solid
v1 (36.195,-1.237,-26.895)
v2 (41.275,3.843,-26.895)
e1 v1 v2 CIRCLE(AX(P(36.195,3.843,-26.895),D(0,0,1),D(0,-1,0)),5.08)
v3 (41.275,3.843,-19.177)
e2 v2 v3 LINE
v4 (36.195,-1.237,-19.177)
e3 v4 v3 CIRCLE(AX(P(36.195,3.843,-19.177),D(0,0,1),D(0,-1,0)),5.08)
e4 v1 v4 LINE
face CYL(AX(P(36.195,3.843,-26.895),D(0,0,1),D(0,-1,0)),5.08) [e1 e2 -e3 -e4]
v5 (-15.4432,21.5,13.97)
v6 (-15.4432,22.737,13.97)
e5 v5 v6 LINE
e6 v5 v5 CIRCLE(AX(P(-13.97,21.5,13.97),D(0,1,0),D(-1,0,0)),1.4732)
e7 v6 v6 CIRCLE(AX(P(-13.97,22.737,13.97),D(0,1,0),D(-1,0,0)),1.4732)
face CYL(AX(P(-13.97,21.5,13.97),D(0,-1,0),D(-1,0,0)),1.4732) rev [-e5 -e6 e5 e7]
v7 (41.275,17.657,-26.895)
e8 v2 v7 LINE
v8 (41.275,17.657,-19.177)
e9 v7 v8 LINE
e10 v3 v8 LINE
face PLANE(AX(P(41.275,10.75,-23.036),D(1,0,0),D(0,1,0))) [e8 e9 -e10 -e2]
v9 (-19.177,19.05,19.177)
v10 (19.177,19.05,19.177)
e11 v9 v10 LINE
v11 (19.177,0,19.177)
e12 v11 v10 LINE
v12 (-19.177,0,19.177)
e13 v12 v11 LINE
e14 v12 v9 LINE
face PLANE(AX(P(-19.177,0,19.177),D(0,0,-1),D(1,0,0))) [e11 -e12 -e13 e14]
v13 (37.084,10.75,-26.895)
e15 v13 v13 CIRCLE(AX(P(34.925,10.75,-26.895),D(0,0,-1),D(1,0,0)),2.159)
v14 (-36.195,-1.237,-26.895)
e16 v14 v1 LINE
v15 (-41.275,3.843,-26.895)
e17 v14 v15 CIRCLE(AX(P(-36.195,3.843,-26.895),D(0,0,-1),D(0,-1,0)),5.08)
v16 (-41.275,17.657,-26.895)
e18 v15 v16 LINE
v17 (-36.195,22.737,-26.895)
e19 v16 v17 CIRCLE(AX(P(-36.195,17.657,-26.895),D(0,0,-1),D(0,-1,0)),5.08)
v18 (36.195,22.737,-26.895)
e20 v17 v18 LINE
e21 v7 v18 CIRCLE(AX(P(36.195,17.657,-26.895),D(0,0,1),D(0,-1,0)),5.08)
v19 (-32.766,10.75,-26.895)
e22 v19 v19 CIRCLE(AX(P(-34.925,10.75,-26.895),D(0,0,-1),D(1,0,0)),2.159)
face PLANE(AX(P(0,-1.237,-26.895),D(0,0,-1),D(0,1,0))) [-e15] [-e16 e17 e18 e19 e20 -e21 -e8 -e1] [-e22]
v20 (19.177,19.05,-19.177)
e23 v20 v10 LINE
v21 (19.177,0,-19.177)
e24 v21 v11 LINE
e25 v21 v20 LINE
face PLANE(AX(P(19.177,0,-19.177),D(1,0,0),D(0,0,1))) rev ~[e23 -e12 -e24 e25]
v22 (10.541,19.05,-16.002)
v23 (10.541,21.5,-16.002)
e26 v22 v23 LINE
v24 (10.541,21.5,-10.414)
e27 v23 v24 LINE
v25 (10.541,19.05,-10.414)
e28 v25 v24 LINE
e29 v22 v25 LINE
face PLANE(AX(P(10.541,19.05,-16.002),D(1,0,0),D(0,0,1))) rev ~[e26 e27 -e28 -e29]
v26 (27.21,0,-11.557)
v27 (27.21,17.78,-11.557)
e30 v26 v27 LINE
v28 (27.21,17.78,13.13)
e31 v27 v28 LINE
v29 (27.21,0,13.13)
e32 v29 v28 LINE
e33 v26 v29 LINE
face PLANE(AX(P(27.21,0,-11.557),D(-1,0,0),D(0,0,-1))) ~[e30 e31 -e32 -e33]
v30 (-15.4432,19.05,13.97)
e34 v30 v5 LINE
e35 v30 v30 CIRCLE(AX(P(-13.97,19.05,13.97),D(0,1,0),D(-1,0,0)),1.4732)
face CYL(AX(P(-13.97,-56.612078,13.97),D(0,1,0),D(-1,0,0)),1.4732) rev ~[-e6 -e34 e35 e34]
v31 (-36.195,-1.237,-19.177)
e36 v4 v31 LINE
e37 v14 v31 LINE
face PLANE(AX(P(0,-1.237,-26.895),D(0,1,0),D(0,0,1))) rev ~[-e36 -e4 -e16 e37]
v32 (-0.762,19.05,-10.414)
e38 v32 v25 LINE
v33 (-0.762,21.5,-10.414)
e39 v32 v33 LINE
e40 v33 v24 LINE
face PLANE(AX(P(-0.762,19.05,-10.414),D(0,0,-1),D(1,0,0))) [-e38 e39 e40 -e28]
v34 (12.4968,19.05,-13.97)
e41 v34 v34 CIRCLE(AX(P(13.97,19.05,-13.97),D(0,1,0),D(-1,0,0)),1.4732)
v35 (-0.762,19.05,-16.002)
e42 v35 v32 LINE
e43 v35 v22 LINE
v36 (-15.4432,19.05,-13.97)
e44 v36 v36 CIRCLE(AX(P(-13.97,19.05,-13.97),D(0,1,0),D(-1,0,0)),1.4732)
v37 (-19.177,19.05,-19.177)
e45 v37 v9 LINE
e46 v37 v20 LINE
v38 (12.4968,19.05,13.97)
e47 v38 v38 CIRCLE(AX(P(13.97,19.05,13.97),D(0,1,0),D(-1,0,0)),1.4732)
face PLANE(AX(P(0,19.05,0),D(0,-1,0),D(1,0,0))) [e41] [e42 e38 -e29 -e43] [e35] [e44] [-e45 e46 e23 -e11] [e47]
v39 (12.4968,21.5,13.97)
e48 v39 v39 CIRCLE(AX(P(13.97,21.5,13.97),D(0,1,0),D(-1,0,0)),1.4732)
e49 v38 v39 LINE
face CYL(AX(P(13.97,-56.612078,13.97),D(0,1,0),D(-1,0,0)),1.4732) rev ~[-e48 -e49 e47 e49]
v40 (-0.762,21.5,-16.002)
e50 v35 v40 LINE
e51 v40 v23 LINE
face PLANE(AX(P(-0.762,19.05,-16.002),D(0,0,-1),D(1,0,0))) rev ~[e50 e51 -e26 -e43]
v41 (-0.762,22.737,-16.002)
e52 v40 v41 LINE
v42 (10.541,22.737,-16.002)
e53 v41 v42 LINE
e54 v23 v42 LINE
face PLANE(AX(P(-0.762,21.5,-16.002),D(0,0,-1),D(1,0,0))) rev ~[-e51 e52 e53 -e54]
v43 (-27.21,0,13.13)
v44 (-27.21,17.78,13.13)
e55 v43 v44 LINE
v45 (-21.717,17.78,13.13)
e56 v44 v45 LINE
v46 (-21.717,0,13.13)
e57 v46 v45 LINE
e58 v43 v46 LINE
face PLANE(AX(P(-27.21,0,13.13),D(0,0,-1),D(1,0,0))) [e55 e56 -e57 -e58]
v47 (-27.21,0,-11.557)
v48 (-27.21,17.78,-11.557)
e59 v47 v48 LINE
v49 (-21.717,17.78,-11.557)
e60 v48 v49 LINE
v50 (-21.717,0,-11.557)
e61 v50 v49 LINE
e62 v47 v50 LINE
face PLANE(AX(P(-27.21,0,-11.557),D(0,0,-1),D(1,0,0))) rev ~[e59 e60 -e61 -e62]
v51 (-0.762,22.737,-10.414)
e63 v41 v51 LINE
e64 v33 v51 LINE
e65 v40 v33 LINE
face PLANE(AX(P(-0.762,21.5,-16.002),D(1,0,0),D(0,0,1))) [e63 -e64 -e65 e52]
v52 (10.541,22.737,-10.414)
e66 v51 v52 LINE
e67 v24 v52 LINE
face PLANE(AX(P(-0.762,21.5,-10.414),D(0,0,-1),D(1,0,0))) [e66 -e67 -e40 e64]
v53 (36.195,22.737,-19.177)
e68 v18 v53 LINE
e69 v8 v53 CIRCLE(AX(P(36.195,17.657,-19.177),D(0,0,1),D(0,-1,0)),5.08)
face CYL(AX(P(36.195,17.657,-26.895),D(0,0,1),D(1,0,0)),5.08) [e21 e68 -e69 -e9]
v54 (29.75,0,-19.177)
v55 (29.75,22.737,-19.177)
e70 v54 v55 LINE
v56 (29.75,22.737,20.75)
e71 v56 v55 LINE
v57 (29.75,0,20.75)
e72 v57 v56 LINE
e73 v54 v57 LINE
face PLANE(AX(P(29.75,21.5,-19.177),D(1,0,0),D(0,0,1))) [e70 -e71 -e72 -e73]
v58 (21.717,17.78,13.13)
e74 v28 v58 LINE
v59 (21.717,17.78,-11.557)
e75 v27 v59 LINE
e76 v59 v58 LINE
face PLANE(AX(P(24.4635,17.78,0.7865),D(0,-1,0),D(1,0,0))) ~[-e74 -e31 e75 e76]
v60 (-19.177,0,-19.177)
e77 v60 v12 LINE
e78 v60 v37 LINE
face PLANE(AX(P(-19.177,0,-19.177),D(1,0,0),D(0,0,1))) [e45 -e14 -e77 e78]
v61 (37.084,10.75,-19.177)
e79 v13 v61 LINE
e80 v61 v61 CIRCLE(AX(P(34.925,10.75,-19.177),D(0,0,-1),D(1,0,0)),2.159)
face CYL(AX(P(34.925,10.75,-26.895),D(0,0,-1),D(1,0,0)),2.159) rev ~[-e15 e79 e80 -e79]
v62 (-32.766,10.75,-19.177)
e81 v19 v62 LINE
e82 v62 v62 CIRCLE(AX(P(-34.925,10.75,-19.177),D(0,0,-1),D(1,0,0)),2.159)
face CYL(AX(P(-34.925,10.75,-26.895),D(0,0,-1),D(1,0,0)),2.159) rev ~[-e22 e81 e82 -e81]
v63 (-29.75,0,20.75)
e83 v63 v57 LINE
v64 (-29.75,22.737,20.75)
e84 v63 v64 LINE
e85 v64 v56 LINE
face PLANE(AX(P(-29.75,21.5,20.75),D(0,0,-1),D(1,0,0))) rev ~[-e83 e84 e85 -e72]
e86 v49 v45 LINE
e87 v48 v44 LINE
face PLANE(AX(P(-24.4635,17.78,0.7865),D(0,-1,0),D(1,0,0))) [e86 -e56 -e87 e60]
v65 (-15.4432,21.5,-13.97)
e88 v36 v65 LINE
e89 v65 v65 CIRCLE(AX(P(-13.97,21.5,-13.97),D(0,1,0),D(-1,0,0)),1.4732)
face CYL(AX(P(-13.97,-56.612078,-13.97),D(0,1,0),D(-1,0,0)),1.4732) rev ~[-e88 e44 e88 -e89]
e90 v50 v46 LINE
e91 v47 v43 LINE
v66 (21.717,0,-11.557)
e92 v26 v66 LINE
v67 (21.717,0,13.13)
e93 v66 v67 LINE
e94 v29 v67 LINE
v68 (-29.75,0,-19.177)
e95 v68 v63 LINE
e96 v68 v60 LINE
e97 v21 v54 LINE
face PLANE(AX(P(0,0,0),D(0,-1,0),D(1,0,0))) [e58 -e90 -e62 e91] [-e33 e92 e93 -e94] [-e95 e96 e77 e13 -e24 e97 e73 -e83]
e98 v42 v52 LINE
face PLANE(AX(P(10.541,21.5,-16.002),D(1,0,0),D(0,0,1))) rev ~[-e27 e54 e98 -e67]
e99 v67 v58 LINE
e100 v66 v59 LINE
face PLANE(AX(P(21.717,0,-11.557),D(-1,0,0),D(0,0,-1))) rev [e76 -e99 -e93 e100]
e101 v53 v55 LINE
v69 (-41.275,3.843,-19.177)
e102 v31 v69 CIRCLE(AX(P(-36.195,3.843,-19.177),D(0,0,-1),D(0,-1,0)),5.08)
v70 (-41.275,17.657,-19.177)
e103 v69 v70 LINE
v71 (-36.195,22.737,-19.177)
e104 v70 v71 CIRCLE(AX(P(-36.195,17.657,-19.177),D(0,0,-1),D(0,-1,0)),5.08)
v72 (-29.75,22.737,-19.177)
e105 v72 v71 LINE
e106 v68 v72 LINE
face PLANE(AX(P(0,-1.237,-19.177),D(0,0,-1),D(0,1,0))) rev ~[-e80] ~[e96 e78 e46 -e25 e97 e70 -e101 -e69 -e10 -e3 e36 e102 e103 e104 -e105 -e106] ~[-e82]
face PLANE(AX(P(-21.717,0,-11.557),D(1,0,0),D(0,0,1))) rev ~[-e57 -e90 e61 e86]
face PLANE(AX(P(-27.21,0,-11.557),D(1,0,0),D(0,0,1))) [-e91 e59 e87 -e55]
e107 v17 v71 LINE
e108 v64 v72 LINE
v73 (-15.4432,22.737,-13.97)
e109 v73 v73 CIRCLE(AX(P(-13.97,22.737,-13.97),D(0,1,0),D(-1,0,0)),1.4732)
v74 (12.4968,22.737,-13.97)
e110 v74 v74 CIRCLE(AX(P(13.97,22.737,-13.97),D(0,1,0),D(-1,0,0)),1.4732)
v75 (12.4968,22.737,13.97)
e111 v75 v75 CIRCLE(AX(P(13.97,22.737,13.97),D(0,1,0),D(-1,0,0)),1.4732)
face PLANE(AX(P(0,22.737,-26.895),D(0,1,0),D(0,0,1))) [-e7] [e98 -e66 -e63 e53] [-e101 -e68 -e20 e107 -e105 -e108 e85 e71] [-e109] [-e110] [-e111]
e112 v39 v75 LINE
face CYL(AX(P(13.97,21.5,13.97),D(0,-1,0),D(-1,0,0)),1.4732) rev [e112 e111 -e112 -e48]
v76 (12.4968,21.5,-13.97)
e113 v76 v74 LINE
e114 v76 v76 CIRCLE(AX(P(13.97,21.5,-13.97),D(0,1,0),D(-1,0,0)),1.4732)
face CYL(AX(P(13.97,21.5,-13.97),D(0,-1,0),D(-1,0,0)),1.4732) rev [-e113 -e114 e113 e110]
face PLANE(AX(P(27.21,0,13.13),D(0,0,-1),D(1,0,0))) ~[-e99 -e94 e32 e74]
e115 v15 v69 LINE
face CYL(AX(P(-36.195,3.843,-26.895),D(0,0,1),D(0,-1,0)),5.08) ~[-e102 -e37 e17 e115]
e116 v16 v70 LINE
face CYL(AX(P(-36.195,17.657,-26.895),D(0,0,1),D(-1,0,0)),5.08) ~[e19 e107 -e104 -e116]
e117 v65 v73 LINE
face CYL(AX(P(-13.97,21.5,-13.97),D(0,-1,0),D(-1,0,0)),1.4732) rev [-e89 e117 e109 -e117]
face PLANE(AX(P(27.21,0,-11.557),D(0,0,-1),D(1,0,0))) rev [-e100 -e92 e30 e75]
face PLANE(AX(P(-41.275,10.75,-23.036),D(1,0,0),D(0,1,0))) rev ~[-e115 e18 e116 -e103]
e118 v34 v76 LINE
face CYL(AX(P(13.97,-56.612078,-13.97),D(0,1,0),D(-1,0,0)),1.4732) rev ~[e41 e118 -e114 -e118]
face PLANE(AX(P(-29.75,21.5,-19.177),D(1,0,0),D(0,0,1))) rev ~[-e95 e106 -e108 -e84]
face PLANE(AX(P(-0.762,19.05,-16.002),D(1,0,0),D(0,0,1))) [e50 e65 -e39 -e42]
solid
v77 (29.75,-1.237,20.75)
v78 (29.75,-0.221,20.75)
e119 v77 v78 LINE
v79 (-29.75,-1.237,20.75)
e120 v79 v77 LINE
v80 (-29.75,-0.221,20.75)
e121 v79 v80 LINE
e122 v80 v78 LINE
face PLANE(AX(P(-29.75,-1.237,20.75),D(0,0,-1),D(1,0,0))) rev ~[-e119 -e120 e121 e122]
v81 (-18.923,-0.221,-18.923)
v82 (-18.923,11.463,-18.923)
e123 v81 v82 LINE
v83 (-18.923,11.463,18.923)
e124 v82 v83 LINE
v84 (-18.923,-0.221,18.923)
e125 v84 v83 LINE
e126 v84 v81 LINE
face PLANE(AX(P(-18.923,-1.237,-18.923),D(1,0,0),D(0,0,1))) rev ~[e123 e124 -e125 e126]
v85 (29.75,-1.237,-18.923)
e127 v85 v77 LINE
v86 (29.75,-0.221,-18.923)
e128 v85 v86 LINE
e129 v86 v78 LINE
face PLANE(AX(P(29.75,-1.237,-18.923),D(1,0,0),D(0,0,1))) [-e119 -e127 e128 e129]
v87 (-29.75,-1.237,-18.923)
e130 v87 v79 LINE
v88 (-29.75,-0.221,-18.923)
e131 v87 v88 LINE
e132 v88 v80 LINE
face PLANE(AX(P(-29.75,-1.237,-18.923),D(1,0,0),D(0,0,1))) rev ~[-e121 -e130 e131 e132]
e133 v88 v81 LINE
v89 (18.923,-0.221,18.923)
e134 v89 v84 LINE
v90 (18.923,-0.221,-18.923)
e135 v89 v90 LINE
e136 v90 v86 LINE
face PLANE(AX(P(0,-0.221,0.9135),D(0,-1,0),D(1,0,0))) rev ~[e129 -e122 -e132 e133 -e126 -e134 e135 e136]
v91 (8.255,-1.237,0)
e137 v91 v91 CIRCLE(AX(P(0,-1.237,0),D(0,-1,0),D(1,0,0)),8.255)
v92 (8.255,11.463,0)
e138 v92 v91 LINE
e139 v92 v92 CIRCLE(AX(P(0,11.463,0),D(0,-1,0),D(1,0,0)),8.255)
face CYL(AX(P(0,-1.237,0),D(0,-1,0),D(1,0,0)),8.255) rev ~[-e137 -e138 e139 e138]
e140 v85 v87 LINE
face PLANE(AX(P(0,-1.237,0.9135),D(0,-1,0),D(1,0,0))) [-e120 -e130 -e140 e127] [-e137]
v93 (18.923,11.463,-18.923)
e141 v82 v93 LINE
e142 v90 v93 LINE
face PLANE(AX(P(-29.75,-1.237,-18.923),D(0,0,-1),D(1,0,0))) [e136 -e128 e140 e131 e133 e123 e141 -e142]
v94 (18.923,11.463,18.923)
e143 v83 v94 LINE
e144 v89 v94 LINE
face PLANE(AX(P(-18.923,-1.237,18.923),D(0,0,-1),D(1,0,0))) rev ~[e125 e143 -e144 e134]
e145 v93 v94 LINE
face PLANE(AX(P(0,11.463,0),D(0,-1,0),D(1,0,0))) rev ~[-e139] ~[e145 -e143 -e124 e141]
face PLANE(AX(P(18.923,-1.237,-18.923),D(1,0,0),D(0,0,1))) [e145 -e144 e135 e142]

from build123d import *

# Parameters (mm, degrees)
F0_W      = 59.5
F0_H      = 41.5
F0_R      = 6
F0_R_2    = 11.5
F1_DEPTH  = 21.5
F7_W      = 38.354
F7_H      = 38.354
F8_DEPTH  = 19.05
F9_W      = 11.303
F9_H      = 5.588
F10_DEPTH = 2.451
F12_D     = 2.9464
F13_W     = 23.974
F13_H     = 7.718
F13_W_2   = 20.828
F13_H_2   = 4.572
F14_DEPTH = 59.5
F15_DEPTH = 1.237
F16_W     = 5.493
F16_H     = 24.687
F17_DEPTH = 17.78
F18_W     = 37.846
F18_H     = 37.846
F18_R     = 8.255
F19_DEPTH = 12.7
F20_W     = 59.5
F20_H     = 39.673
F20_R     = 8.255
F21_DEPTH = 1.016
F22_W     = 23.974
F22_H     = 7.718
F23_DEPTH = 41.275
F24_R     = 2.159
F25_DEPTH = 25.4
F26_R     = 5.08


# Not quite as in the source:
# - a feature of the source that left no trace in its solid (it failed there, or was rolled back) is left out
# - a pattern or mirror of a feature is missing from the dataset's text; its kind, count and spacing are read off the source's solid


with BuildPart() as f1:
    # F0 (on Front) → F1 (new body)
    with BuildSketch(Plane.XZ):
        Rectangle(F0_W, F0_H)
        with Locations((-17.25, -10.75)):
            Circle(F0_R, mode=Mode.SUBTRACT)
        with BuildLine():
            ThreePointArc((-23.75, 14.75), (-23.4571067812, 15.4571067812), (-22.75, 15.75))
            Line((-22.75, 15.75), (-11.25, 15.75))
            ThreePointArc((-11.25, 15.75), (-10.5428932188, 15.4571067812), (-10.25, 14.75))
            Line((-10.25, 14.75), (-10.25, -0.25))
            ThreePointArc((-10.25, -0.25), (-10.5428932188, -0.9571067812), (-11.25, -1.25))
            Line((-11.25, -1.25), (-22.75, -1.25))
            ThreePointArc((-22.75, -1.25), (-23.4571067812, -0.9571067812), (-23.75, -0.25))
            Line((-23.75, -0.25), (-23.75, 14.75))
        make_face(mode=Mode.SUBTRACT)
        with Locations((14.45, 7.05)):
            Circle(F0_R_2, mode=Mode.SUBTRACT)
        with BuildLine():
            Line((-11.25, 15.75), (-22.75, 15.75))
            ThreePointArc((-22.75, 15.75), (-23.4571067812, 15.4571067812), (-23.75, 14.75))
            Line((-23.75, 14.75), (-23.75, -0.25))
            ThreePointArc((-23.75, -0.25), (-23.4571067812, -0.9571067812), (-22.75, -1.25))
            Line((-22.75, -1.25), (-11.25, -1.25))
            ThreePointArc((-11.25, -1.25), (-10.5428932188, -0.9571067812), (-10.25, -0.25))
            Line((-10.25, -0.25), (-10.25, 14.75))
            ThreePointArc((-10.25, 14.75), (-10.5428932188, 15.4571067812), (-11.25, 15.75))
        make_face()
        with Locations((14.45, 7.05)):
            Circle(F0_R_2)
        with Locations((-17.25, -10.75)):
            Circle(F0_R)
    extrude(amount=-F1_DEPTH)

    # F7 (on face) → F8 (cut)
    with BuildSketch(Plane.XZ):
        Rectangle(F7_W, F7_H)
    extrude(amount=-F8_DEPTH, mode=Mode.SUBTRACT)

    # F9 (on face) → F10 (cut, through all)
    with BuildSketch(Plane.XZ.offset(-19.05)):
        with Locations((4.8895, -13.208)):
            Rectangle(F9_W, F9_H)
    extrude(amount=-F10_DEPTH, mode=Mode.SUBTRACT)

    # F12 (through all)
    with Locations(Plane.XZ.offset(-19.05)):
        with Locations((-13.97, 13.97), (13.97, 13.97), (13.97, -13.97), (-13.97, -13.97)):
            Hole(F12_D / 2)

    # F13 (on face) → F14 (join, through all)
    with BuildSketch(Plane.YZ.offset(29.75)):
        with Locations((10.75, -23.036)):
            Rectangle(F13_W, F13_H)
        with Locations((10.75, -23.036)):
            Rectangle(F13_W_2, F13_H_2, mode=Mode.SUBTRACT)
    extrude(amount=-F14_DEPTH)

    # F15 (add, through all): a face of the model
    f15_faces = [f1.faces().sort_by_distance(p)[0] for p in [
        (-0.1351406862, 21.5, 1.1826798979),
    ]]
    extrude(f15_faces, amount=F15_DEPTH)

    # F16 (on face) → F17 (cut)
    with BuildSketch(Plane.XZ):
        with Locations((-24.4635, 0.7865)):
            Rectangle(F16_W, F16_H)
    f17 = extrude(amount=-F17_DEPTH, mode=Mode.SUBTRACT)

    # F17_copies: F17 across plane
    add(f17.mirror(Plane(origin=(0, 0, 0), x_dir=(0, 0, 1), z_dir=(1, 0, 0))), mode=Mode.SUBTRACT)

    # F22 (on Right) → F23 (join, symmetric)
    with BuildSketch(Plane.YZ):
        with Locations((10.75, -23.036)):
            Rectangle(F22_W, F22_H)
    extrude(amount=F23_DEPTH, both=True)

    # F24 (on face) → F25 (cut)
    with BuildSketch(Plane(origin=(0, 0, -26.895), x_dir=(1, 0, 0), z_dir=(0, 0, -1))):
        with Locations((-34.925, -10.75)):
            Circle(F24_R)
        with Locations((34.925, -10.75)):
            Circle(F24_R)
    extrude(amount=-F25_DEPTH, mode=Mode.SUBTRACT)

    # F26
    f26_edges = [f1.edges().sort_by_distance(p)[0] for p in [
        (-41.275, 22.737, -23.036),
        (-41.275, -1.237, -23.036),
        (41.275, 22.737, -23.036),
        (41.275, -1.237, -23.036),
    ]]
    fillet(f26_edges, radius=F26_R)


with BuildPart() as f19:
    # F18 (on face) → F19 (new body)
    with BuildSketch(Plane.XZ.offset(1.237)):
        Rectangle(F18_W, F18_H)
        Circle(F18_R, mode=Mode.SUBTRACT)
    extrude(amount=-F19_DEPTH)

    # F20 (on face) → F21 (join)
    with BuildSketch(Plane.XZ.offset(1.237)):
        with Locations((0, 0.9135)):
            Rectangle(F20_W, F20_H)
        Circle(F20_R, mode=Mode.SUBTRACT)
    extrude(amount=-F21_DEPTH)


solid = Compound([f1.part, f19.part])
